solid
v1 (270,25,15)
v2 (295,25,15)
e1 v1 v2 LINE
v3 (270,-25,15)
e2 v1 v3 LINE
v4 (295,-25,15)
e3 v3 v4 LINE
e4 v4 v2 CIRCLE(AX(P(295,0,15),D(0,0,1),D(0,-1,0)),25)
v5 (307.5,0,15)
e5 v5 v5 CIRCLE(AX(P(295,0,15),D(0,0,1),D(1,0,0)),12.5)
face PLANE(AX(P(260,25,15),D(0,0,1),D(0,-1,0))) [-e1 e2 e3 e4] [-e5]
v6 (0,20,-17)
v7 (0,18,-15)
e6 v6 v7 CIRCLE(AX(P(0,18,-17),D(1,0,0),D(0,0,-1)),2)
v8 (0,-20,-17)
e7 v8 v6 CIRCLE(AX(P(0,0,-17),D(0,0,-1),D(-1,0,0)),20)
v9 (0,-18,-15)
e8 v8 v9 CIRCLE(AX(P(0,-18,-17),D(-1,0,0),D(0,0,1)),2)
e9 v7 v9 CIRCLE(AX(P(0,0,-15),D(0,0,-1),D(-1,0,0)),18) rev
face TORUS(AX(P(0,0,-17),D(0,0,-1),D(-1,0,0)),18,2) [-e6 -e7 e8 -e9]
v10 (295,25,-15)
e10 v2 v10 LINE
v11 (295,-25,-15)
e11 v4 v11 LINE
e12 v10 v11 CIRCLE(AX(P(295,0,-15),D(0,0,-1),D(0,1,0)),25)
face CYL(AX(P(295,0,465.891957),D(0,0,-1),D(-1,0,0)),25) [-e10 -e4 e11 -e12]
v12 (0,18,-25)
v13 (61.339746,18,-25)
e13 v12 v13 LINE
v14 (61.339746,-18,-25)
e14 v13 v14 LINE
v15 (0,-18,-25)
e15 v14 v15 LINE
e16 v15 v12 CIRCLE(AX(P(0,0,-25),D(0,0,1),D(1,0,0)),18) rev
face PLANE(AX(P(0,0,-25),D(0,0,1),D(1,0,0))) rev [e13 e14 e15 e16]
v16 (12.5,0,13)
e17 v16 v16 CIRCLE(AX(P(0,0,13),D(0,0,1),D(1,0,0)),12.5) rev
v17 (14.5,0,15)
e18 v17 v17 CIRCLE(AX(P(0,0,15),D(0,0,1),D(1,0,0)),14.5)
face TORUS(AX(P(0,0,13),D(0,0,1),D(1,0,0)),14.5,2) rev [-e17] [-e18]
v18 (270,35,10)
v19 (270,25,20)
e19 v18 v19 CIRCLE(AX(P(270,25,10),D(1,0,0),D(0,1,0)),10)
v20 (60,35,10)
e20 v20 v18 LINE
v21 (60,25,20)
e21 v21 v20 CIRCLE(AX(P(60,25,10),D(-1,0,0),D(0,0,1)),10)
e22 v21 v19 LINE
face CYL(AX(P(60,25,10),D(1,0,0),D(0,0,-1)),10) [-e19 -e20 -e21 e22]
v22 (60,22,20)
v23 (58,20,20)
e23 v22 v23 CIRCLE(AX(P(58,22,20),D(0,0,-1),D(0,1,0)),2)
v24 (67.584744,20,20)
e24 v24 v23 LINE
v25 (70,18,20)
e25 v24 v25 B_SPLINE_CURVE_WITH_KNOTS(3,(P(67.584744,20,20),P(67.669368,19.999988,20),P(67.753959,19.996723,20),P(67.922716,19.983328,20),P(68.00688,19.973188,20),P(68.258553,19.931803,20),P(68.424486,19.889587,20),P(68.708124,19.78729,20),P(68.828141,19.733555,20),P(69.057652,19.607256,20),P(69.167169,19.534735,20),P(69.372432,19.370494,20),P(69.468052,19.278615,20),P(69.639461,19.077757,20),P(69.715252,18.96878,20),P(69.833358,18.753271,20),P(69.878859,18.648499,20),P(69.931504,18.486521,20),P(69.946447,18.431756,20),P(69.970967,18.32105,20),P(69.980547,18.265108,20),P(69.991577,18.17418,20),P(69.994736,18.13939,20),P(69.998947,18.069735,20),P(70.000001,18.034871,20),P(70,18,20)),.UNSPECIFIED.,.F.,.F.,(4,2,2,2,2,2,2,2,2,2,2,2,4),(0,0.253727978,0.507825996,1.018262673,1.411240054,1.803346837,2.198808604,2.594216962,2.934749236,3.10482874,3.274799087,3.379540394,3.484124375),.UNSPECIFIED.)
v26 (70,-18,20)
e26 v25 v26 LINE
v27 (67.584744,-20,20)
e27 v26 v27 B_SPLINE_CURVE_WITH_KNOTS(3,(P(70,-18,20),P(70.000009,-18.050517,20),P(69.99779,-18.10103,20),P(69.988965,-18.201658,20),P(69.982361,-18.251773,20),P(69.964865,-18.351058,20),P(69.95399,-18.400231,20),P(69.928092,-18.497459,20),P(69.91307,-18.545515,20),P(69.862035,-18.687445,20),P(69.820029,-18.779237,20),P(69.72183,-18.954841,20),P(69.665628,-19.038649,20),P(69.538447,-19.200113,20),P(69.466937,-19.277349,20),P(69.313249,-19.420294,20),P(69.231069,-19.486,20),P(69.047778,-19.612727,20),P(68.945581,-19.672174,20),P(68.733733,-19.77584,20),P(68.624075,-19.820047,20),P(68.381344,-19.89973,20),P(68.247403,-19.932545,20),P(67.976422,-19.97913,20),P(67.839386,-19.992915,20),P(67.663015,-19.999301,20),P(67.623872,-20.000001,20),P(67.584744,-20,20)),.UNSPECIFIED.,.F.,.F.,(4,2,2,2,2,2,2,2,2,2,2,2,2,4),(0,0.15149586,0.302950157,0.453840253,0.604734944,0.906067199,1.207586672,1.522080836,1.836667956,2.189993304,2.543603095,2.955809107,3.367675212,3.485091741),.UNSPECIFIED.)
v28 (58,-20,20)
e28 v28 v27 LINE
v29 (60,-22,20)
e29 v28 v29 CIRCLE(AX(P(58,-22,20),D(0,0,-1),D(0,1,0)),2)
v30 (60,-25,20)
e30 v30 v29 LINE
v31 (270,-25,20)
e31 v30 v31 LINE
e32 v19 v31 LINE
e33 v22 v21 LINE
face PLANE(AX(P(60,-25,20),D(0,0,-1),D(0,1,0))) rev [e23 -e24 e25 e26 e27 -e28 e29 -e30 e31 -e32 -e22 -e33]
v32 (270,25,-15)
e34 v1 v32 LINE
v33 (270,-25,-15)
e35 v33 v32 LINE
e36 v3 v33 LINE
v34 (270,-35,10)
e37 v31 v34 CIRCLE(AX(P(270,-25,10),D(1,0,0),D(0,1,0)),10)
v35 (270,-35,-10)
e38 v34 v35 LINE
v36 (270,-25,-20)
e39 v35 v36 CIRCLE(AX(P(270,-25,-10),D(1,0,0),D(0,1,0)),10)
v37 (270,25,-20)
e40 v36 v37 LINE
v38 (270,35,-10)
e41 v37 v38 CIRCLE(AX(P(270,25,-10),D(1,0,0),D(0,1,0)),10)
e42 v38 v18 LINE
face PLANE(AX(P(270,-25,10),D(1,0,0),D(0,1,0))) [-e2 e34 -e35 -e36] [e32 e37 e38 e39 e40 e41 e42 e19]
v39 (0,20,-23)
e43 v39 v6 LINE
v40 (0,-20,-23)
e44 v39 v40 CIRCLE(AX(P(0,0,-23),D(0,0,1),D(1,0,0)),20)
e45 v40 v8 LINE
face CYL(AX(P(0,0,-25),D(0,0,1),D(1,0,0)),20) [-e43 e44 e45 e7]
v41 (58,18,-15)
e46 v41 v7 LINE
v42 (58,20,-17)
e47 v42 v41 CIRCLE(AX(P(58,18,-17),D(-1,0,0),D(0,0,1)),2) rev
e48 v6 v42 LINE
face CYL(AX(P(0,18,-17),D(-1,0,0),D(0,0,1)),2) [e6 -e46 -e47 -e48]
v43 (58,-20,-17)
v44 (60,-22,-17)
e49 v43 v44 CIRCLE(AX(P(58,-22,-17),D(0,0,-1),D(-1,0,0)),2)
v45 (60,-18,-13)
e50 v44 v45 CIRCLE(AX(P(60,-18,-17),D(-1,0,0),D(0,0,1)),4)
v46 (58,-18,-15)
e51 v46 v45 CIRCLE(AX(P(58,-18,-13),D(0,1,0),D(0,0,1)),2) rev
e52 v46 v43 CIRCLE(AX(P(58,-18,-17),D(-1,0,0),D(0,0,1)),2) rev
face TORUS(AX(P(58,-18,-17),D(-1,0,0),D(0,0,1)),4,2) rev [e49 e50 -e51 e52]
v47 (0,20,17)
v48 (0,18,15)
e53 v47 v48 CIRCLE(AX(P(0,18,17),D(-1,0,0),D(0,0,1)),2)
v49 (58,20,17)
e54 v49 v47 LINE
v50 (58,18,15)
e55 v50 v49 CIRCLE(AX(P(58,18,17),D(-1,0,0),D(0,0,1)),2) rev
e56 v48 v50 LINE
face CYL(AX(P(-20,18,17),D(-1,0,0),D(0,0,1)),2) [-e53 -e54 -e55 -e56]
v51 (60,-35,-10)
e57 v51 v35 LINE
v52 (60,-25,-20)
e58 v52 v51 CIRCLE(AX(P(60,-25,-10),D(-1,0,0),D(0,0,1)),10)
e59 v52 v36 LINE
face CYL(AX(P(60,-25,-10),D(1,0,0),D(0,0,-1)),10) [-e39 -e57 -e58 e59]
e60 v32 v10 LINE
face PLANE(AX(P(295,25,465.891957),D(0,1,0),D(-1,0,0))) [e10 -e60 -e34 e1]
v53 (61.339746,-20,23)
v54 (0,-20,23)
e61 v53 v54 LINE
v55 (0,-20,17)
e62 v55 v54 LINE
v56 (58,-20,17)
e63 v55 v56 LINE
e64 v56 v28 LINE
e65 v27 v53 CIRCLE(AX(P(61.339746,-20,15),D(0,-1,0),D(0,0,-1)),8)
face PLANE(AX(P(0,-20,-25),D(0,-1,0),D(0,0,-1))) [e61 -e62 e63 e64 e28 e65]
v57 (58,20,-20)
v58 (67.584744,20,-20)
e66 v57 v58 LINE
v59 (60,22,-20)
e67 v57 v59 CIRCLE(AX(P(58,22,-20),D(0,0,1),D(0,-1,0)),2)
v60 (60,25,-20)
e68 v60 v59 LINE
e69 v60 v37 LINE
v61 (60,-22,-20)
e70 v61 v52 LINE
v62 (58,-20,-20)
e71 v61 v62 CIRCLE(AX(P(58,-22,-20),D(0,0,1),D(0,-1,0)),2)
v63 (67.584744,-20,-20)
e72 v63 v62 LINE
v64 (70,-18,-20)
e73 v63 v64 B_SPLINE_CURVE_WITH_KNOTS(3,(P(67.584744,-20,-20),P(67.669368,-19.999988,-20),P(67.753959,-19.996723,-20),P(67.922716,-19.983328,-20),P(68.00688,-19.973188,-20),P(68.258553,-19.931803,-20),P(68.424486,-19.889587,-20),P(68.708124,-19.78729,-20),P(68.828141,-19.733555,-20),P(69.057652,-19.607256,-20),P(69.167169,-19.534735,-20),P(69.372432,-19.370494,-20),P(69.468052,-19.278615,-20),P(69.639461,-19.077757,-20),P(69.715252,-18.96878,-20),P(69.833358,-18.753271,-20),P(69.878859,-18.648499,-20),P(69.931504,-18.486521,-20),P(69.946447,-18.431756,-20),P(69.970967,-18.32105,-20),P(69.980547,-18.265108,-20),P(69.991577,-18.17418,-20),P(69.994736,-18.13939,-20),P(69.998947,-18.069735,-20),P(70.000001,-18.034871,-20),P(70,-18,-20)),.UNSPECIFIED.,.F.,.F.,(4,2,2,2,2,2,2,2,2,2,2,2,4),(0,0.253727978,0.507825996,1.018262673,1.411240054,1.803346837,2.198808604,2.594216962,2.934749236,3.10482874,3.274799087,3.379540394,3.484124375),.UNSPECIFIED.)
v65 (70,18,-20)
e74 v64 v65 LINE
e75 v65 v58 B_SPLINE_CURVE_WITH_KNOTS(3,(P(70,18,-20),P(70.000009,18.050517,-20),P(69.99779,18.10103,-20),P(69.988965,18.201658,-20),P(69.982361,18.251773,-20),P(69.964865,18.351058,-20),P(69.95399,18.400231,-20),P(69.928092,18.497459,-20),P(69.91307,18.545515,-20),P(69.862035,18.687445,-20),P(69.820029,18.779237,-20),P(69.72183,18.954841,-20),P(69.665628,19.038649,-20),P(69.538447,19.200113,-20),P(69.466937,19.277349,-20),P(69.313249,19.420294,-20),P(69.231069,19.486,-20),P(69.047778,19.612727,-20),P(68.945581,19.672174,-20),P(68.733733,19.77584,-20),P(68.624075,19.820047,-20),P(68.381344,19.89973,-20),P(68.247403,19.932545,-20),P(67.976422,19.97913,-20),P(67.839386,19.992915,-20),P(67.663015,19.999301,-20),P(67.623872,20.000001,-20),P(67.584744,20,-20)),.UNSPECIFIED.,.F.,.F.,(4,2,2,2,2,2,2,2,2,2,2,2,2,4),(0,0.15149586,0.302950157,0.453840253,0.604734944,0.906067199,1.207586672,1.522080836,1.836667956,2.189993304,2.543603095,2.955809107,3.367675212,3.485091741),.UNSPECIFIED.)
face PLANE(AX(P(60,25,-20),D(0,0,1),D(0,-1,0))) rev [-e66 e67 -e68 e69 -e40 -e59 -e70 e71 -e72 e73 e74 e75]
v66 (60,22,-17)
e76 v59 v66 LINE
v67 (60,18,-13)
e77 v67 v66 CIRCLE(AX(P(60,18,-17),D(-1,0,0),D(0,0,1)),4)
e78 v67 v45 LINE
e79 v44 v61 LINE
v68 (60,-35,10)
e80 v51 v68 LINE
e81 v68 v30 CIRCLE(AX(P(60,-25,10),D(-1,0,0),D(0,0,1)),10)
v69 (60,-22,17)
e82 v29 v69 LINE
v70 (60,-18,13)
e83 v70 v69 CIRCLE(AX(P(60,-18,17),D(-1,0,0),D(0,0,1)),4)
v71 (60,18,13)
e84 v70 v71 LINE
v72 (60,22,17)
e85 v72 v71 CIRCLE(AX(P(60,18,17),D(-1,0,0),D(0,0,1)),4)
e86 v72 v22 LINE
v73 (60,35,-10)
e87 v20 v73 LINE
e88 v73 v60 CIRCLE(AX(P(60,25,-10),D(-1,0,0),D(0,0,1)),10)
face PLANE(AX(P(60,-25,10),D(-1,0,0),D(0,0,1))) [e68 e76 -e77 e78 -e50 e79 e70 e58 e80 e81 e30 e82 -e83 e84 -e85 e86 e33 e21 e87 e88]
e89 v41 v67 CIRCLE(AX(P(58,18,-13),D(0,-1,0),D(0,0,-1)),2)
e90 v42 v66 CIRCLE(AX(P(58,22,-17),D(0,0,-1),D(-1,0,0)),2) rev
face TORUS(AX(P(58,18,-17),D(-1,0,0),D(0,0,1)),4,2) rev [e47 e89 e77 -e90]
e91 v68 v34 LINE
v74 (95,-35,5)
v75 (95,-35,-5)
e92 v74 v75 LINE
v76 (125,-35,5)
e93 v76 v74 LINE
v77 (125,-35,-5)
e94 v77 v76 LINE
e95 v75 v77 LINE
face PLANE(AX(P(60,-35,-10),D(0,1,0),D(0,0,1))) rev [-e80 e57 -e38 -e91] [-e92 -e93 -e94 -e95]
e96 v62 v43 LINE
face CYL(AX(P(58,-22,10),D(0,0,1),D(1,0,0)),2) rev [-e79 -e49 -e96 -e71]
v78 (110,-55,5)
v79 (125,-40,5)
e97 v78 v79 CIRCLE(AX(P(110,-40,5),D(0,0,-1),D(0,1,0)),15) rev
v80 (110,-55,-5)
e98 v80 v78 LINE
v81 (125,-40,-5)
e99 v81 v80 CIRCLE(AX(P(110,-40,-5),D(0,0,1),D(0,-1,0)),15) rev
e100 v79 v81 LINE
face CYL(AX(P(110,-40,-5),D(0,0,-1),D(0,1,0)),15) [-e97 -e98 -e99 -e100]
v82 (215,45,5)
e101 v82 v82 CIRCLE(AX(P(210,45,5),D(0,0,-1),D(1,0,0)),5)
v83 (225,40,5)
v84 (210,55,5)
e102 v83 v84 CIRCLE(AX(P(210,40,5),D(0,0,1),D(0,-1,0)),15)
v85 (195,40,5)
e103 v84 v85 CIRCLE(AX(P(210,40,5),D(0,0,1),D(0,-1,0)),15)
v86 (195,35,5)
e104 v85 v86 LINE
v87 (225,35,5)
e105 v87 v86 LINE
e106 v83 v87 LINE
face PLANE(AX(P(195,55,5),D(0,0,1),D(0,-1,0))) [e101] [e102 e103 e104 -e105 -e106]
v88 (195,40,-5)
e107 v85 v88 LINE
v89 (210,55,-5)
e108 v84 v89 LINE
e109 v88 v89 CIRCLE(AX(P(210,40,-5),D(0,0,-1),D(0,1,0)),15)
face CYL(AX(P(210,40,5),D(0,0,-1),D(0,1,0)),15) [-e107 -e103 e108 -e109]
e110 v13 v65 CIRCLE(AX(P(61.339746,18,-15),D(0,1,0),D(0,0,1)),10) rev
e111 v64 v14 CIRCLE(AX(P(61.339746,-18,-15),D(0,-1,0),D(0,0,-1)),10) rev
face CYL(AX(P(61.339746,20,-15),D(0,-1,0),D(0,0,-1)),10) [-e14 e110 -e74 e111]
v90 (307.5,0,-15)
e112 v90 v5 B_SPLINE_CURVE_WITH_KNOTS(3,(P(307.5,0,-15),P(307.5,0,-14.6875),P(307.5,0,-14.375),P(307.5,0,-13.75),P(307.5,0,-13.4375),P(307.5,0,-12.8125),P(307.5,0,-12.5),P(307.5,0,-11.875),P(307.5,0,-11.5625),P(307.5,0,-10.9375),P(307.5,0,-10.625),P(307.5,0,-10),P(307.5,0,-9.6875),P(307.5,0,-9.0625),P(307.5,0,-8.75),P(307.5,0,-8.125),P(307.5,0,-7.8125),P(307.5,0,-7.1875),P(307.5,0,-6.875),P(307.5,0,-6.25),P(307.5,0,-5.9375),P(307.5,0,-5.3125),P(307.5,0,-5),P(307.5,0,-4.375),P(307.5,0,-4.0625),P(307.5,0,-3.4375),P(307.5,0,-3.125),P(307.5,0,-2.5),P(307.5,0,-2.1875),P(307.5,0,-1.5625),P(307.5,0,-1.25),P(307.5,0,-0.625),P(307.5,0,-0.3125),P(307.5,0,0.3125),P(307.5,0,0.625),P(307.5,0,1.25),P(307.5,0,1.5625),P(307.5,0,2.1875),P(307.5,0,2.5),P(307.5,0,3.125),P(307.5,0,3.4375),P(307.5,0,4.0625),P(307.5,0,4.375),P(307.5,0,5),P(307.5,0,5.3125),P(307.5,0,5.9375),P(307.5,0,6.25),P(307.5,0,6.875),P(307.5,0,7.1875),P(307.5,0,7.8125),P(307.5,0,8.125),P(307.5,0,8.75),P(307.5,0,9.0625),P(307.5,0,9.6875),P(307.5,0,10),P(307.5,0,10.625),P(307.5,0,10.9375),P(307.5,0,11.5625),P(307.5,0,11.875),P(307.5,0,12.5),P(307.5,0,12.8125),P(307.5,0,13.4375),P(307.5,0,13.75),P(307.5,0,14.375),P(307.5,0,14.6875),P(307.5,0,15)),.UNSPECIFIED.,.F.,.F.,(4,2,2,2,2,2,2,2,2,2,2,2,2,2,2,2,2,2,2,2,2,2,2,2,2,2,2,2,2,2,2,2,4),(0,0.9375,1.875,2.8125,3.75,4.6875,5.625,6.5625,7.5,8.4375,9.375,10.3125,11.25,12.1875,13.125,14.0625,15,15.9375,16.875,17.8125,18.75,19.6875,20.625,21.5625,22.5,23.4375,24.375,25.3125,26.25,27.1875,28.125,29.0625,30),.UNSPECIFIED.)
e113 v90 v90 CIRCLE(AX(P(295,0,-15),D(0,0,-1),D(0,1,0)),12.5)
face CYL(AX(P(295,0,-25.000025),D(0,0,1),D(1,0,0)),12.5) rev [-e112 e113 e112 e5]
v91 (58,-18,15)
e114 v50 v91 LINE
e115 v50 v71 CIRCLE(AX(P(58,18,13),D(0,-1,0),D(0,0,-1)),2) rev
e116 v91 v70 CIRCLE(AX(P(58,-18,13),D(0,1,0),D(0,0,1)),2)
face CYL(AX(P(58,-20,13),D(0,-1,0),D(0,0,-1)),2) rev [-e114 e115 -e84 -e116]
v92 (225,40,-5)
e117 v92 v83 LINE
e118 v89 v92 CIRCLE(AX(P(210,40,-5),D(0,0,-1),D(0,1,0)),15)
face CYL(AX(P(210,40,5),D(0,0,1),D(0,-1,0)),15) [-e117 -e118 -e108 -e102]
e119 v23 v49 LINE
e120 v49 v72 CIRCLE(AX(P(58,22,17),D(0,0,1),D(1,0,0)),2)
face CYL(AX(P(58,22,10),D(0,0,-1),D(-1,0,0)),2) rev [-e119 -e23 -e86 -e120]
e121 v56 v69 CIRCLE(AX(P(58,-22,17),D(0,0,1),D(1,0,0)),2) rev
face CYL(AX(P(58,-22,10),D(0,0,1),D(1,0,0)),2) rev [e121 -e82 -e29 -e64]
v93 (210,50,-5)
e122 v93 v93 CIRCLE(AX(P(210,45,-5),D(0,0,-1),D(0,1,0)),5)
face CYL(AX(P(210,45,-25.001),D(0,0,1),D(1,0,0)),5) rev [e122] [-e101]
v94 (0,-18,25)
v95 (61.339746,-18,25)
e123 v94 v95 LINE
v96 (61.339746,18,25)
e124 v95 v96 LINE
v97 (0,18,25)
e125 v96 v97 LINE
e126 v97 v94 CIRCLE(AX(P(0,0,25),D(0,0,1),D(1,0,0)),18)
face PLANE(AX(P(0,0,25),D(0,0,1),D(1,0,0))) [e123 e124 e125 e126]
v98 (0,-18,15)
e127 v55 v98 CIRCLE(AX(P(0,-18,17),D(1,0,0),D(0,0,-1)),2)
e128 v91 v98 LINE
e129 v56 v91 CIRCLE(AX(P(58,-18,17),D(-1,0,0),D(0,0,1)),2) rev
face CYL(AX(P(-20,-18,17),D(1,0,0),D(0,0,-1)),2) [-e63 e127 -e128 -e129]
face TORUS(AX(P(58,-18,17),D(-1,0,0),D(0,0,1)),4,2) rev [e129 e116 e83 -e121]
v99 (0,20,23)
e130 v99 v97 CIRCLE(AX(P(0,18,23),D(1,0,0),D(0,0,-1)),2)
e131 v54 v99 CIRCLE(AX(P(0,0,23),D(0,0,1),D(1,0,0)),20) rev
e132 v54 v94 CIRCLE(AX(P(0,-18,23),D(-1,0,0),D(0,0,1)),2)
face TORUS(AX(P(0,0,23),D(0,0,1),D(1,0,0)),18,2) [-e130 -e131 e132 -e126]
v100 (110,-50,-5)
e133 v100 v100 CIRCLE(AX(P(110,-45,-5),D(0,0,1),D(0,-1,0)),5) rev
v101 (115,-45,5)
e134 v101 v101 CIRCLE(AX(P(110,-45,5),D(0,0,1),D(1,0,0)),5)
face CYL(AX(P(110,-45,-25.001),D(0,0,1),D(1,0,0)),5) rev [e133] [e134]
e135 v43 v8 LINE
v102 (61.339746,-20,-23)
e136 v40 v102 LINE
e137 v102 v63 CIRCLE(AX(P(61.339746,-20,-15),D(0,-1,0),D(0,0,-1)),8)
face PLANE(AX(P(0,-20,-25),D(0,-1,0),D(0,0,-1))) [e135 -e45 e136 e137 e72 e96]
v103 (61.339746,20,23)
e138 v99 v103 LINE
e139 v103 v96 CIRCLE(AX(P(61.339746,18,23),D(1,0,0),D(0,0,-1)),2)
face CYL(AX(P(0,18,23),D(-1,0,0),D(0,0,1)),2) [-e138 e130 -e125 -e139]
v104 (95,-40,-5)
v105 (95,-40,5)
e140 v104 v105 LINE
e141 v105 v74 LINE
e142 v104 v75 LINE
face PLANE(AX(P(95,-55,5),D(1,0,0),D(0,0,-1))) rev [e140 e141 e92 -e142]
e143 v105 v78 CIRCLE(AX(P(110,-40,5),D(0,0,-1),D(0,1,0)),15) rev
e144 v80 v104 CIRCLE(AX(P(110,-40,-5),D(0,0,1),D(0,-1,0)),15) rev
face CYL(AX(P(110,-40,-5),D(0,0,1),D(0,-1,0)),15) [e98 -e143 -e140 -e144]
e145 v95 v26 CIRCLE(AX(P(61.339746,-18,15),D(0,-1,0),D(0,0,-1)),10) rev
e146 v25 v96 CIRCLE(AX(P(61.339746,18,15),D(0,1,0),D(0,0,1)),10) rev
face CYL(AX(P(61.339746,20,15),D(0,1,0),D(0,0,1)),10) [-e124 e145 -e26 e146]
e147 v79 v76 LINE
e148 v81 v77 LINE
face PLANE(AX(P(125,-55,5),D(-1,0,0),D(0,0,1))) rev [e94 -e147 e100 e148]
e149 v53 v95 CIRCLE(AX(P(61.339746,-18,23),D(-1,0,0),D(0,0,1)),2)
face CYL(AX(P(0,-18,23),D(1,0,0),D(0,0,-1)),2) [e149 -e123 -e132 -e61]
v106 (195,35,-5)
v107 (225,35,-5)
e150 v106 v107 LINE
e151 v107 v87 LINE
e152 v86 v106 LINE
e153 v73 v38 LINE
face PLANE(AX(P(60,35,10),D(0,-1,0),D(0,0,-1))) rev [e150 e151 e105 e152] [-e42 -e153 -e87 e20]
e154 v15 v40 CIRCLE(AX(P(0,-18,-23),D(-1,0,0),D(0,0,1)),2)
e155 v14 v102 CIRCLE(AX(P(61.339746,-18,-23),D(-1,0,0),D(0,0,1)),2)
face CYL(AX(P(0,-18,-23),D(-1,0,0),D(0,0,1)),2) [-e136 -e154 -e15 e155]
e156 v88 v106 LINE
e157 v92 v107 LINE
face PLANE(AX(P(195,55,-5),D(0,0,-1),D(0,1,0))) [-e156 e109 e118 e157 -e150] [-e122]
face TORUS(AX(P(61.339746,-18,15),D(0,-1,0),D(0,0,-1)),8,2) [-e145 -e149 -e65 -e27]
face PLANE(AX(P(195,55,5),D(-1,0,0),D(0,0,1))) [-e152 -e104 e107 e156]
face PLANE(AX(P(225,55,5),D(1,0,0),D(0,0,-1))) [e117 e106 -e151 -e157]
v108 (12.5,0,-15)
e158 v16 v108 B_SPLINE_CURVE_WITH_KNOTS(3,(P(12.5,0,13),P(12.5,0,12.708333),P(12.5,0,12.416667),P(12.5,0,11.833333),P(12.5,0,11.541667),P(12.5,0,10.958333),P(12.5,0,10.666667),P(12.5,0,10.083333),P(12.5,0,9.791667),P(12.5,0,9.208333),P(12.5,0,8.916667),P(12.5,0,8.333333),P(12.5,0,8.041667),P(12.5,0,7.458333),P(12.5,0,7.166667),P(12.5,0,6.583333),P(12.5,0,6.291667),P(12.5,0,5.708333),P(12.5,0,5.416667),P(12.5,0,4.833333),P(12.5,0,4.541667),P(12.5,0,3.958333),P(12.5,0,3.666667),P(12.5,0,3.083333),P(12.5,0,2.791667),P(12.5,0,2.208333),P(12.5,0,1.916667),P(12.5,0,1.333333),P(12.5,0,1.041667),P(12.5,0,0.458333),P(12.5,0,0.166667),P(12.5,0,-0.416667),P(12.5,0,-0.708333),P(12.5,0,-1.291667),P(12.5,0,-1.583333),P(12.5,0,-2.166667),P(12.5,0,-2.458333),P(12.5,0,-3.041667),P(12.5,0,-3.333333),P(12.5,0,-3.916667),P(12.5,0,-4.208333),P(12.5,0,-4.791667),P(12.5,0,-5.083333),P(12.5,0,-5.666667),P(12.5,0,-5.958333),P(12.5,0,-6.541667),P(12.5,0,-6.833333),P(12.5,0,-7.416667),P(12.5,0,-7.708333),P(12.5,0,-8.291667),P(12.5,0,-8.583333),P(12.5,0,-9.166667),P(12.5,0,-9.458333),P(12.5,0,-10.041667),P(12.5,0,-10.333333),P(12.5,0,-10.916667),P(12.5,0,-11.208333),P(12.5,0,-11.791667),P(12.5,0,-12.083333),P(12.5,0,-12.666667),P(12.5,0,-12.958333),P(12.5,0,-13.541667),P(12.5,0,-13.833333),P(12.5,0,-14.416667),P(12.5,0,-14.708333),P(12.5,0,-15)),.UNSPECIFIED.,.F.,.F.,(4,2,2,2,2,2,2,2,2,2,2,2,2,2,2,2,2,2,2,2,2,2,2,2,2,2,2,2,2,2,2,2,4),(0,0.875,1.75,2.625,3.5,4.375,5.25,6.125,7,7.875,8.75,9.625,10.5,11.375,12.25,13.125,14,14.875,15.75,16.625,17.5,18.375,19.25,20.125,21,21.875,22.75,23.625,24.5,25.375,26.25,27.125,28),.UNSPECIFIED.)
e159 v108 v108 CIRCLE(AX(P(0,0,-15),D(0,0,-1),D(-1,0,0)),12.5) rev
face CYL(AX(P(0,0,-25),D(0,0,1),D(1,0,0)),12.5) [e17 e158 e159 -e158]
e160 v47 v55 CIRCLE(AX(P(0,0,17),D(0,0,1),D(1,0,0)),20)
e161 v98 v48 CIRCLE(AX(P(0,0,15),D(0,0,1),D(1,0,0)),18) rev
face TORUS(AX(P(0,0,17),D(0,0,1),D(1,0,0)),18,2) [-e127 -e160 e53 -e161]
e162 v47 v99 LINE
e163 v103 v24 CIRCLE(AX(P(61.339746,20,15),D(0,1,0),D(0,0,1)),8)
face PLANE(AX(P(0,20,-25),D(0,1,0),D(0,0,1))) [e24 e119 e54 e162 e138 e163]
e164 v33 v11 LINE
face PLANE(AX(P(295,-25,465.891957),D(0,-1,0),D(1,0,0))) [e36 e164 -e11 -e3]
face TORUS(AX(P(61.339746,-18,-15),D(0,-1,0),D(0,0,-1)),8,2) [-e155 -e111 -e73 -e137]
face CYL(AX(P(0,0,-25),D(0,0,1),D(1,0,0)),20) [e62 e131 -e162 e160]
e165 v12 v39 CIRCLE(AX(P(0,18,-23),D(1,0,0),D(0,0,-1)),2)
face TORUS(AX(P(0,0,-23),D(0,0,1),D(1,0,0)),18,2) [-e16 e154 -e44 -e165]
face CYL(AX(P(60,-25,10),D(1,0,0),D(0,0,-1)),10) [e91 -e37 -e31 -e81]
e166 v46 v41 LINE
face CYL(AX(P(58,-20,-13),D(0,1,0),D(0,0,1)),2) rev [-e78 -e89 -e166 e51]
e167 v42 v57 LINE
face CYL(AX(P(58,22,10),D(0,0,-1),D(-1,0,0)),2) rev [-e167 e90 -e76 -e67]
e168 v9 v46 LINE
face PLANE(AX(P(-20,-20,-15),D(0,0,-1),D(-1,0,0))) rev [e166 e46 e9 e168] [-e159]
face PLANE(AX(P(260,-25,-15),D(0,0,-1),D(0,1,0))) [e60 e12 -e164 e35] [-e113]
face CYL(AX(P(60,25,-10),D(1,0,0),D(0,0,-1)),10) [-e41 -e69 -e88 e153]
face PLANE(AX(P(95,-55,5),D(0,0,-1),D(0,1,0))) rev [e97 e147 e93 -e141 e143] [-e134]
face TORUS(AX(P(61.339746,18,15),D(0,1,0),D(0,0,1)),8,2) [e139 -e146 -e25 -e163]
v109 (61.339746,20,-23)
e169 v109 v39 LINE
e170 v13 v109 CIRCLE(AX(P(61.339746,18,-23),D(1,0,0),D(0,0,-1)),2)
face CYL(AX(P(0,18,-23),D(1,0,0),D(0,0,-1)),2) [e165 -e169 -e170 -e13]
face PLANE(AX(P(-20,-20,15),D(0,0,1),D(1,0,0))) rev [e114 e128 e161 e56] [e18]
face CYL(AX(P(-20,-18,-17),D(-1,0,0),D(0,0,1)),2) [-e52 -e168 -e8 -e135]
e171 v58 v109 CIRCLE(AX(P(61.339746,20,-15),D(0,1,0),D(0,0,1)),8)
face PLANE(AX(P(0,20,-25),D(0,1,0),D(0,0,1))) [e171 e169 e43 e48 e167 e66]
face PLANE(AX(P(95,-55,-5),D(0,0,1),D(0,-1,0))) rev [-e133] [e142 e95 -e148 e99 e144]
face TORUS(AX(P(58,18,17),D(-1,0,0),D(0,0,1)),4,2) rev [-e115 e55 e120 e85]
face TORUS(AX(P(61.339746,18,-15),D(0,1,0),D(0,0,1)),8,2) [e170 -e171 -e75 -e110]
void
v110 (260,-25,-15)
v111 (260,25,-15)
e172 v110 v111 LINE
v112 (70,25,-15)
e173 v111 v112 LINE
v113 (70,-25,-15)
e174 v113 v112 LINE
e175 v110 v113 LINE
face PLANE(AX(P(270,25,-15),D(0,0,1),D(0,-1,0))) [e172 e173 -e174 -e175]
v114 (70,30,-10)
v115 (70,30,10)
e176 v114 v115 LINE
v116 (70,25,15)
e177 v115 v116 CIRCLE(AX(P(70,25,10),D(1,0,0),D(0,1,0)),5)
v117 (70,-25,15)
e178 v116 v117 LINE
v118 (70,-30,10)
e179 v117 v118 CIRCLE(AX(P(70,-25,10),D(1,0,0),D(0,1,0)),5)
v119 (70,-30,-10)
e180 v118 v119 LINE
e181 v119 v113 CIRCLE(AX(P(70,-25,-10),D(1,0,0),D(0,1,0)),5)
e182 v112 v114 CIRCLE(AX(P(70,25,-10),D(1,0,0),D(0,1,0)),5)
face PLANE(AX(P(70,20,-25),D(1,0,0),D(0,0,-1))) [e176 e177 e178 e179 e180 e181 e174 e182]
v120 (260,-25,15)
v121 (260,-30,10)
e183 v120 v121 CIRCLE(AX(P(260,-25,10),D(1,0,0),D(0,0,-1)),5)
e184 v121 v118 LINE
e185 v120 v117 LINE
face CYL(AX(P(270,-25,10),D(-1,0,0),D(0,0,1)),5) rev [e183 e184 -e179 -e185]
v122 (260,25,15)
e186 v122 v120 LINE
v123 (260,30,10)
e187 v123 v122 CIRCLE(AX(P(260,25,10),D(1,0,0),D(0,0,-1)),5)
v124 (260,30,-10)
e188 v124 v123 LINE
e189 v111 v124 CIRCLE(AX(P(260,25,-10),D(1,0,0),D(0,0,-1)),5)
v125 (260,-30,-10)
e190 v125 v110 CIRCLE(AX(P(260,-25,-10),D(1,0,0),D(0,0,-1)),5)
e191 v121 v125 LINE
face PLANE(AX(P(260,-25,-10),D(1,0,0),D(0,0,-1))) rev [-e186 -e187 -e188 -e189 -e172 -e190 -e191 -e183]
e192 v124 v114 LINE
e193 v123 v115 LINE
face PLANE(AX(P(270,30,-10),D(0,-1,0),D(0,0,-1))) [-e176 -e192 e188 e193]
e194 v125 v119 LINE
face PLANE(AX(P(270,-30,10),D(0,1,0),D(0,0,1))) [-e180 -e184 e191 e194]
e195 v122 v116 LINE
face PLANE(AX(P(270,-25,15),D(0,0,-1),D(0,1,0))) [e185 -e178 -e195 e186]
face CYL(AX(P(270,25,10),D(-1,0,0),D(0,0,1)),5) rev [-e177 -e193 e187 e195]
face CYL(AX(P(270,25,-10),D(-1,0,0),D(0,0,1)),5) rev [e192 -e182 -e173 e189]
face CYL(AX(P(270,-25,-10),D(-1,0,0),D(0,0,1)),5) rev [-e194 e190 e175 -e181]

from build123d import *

# Parameters (mm, degrees)
BOSS_EXTRUDE1_DEPTH      = 25
BOSS_EXTRUDE1_DEPTH_BACK = 25
SKETCH2_W                = 30
SKETCH2_H                = 40
CUT_EXTRUDE1_DEPTH       = 96.524865873
BOSS_EXTRUDE2_REACH      = 90.318
SKETCH3_R                = 12.5
STRUCTURAL_MEMBER1_DEPTH = 200
BOSS_EXTRUDE3_DEPTH      = 10
BOSS_EXTRUDE4_DEPTH      = 50
BOSS_EXTRUDE4_DEPTH_BACK = 10
CUT_EXTRUDE6_START       = -30
CUT_EXTRUDE6_DEPTH       = 30
SKETCH16_R               = 12.5
CUT_EXTRUDE7_DEPTH       = 325.384031666
FILLET1_R                = 10
FILLET2_R                = 2
FILLET3_R                = 2
SKETCH19_W               = 30
SKETCH19_H               = 10
BOSS_EXTRUDE6_DEPTH      = 20
FILLET5_R                = 15
CUT_EXTRUDE8_REACH       = 328.075
SKETCH20_R               = 5
FILLET5_OF_MIRROR9_R     = 15
LPATTERN1_START          = -5
LPATTERN1_OUTLINE_R      = 5
LPATTERN1_DEPTH          = 10
CUT_EXTRUDE9_START       = 35
CUT_EXTRUDE9_OUTLINE_W   = 30
CUT_EXTRUDE9_OUTLINE_H   = 10
CUT_EXTRUDE9_DEPTH       = 20
CUT_EXTRUDE10_START      = -25
CUT_EXTRUDE10_OUTLINE_R  = 5
CUT_EXTRUDE10_DEPTH      = 10


# Read off the part's stored shape, not the designer's step: Cut-Extrude6, LPattern1, Cut-Extrude9, Cut-Extrude10
# Some blends are built 0.0001 mm under size
with BuildPart() as part:
    # Sketch1 → Boss-Extrude1 (new, two sides: drawn at the far end of the back side and taken through both)
    with BuildSketch(Plane.XY.offset(-BOSS_EXTRUDE1_DEPTH_BACK)):
        with BuildLine():
            Line((0, 20), (70, 20))
            Line((70, 20), (70, -20))
            Line((70, -20), (0, -20))
            ThreePointArc((0, -20), (-20, 0), (0, 20))
        make_face()
    extrude(amount=BOSS_EXTRUDE1_DEPTH + BOSS_EXTRUDE1_DEPTH_BACK)

    # Sketch2 → Cut-Extrude1 (cut, through all)
    with BuildSketch(Plane(origin=(70, 0, 0), x_dir=(0, 0, -1), z_dir=(1, 0, 0))):
        Rectangle(SKETCH2_W, SKETCH2_H)
    extrude(amount=-CUT_EXTRUDE1_DEPTH, mode=Mode.SUBTRACT)


with BuildPart() as cut_extrude1_piece_1:
    # of the separate pieces the step leaves, piece 1, a body of its own (cut_extrude1_pieces)
    add(part.part.solids().sort_by_distance((0, 20, -25))[0])

    # Sketch3 → Boss-Extrude2 (add, up to next)
    with BuildSketch(Plane.XY.offset(25), mode=Mode.PRIVATE) as boss_extrude2_sk1:
        Circle(SKETCH3_R)
    boss_extrude2_tool1 = extrude(boss_extrude2_sk1.sketch, amount=-BOSS_EXTRUDE2_REACH, mode=Mode.PRIVATE) - cut_extrude1_piece_1.part


with BuildPart() as cut_extrude1_piece_2:
    # of the separate pieces the step leaves, piece 2, a body of its own (cut_extrude1_pieces)
    add(part.part.solids().sort_by_distance((0, 20, 15))[0])


with BuildPart() as cut_extrude1_piece_1_1:
    add(cut_extrude1_piece_1.part)

    add(cut_extrude1_piece_2.part)  # Boss-Extrude2 merges Cut-Extrude1 piece 2
    add(boss_extrude2_tool1.solids().sort_by_distance((0, 0, 25))[0])



with BuildPart() as body_2:
    # Sketch11 → Structural Member1 (new body)
    with BuildSketch(Plane(origin=(70, 0, 0), x_dir=(0, 0, 1), z_dir=(1, 0, 0))):
        with BuildLine():
            Line((-10, -35), (10, -35))
            ThreePointArc((10, -35), (17.071067812, -32.071067812), (20, -25))
            Line((20, -25), (20, 25))
            ThreePointArc((20, 25), (17.071067812, 32.071067812), (10, 35))
            Line((10, 35), (-10, 35))
            ThreePointArc((-10, 35), (-17.071067812, 32.071067812), (-20, 25))
            Line((-20, 25), (-20, -25))
            ThreePointArc((-20, -25), (-17.071067812, -32.071067812), (-10, -35))
        make_face()
        with BuildLine():
            Line((-10, -30), (10, -30))
            ThreePointArc((10, -30), (13.535533906, -28.535533906), (15, -25))
            Line((15, -25), (15, 25))
            ThreePointArc((15, 25), (13.535533906, 28.535533906), (10, 30))
            Line((10, 30), (-10, 30))
            ThreePointArc((-10, 30), (-13.535533906, 28.535533906), (-15, 25))
            Line((-15, 25), (-15, -25))
            ThreePointArc((-15, -25), (-13.535533906, -28.535533906), (-10, -30))
        make_face(mode=Mode.SUBTRACT)
    extrude(amount=STRUCTURAL_MEMBER1_DEPTH)


with BuildPart() as cut_extrude1_piece_1_2:
    add(cut_extrude1_piece_1_1.part)

    add(body_2.part)  # Boss-Extrude3 merges body 2
    # Sketch12 → Boss-Extrude3 (add)
    with BuildSketch(Plane.ZY.offset(-70)):
        with BuildLine():
            Line((20, -25), (20, 25))
            ThreePointArc((20, 25), (17.071067812, 32.071067812), (10, 35))
            Line((10, 35), (-10, 35))
            ThreePointArc((-10, 35), (-17.071067812, 32.071067812), (-20, 25))
            Line((-20, 25), (-20, -25))
            ThreePointArc((-20, -25), (-17.071067812, -32.071067812), (-10, -35))
            Line((-10, -35), (10, -35))
            ThreePointArc((10, -35), (17.071067812, -32.071067812), (20, -25))
        make_face()
    extrude(amount=BOSS_EXTRUDE3_DEPTH)

    # Sketch14 → Boss-Extrude4 (add, two sides: drawn at the far end of the back side and taken through both)
    with BuildSketch(Plane(origin=(270, 0, 0), x_dir=(0, 0, -1), z_dir=(1, 0, 0)).offset(-BOSS_EXTRUDE4_DEPTH_BACK)):
        with BuildLine():
            Line((15, -25), (15, 25))
            ThreePointArc((15, 25), (13.535533906, 28.535533906), (10, 30))
            Line((10, 30), (-10, 30))
            ThreePointArc((-10, 30), (-13.535533906, 28.535533906), (-15, 25))
            Line((-15, 25), (-15, -25))
            ThreePointArc((-15, -25), (-13.535533906, -28.535533906), (-10, -30))
            Line((-10, -30), (10, -30))
            ThreePointArc((10, -30), (13.535533906, -28.535533906), (15, -25))
        make_face()
    extrude(amount=BOSS_EXTRUDE4_DEPTH + BOSS_EXTRUDE4_DEPTH_BACK)

    # Cut-Extrude6 outline → Cut-Extrude6 (cut)
    with BuildSketch(Plane.XY.offset(15).offset(CUT_EXTRUDE6_START)):
        with BuildLine():
            Line((270, -25), (270, -30))
            Line((270, -30), (320, -30))
            Line((320, -30), (320, -2.73e-07))
            ThreePointArc((320, -2.73e-07), (312.677669433, -17.677669626), (295, -25))
            Line((295, -25), (270, -25))
        make_face()
        with BuildLine():
            Line((270, 30), (270, 25))
            Line((270, 25), (295, 25))
            ThreePointArc((295, 25), (312.677669626, 17.677669433), (320, -2.73e-07))
            Line((320, -2.73e-07), (320, 30))
            Line((320, 30), (270, 30))
        make_face()
    extrude(amount=CUT_EXTRUDE6_DEPTH, mode=Mode.SUBTRACT)

    # Sketch16 → Cut-Extrude7 (cut, through all)
    with BuildSketch(Plane.XY.offset(15)):
        with Locations((295, 0)):
            Circle(SKETCH16_R)
    extrude(amount=-CUT_EXTRUDE7_DEPTH, mode=Mode.SUBTRACT)

    # Fillet1
    # the kernel refuses this fillet: 10 mm, written as the material it takes off along each edge
    with BuildSketch(Plane(origin=(70, 41.650635095, -25), x_dir=(0, 0, 1), z_dir=(0, -1, 0))) as fillet1_piece_1:
        with BuildLine():
            CenterArc((10, 8.660254038), FILLET1_R, 180, 60)
            Line((0, 8.660254038), (-0.2, 8.660254038))
            Line((-0.2, 8.660254038), (-0.2, 0))
            Line((-0.2, 0), (0, -0.2))
            ThreePointArc((0, -0.2), (2.5, -0.2), (4.9, -0.173205081))
            Line((4.9, -0.173205081), (5, 0))
        make_face()
    extrude(amount=83.301270189, mode=Mode.SUBTRACT)
    with BuildSketch(Plane(origin=(70, 41.650635095, 25), x_dir=(0, 0, -1), z_dir=(0, -1, 0))) as fillet1_piece_2:
        with BuildLine():
            CenterArc((10, -8.660254038), FILLET1_R, 120, 60)
            Line((0, -8.660254038), (-0.2, -8.660254038))
            Line((-0.2, -8.660254038), (-0.2, 0))
            Line((-0.2, 0), (0, 0.2))
            ThreePointArc((0, 0.2), (2.5, 0.2), (4.9, 0.173205081))
            Line((4.9, 0.173205081), (5, 0))
        make_face()
    extrude(amount=83.301270189, mode=Mode.SUBTRACT)

    # Fillet2
    fillet2_edges = [cut_extrude1_piece_1_2.edges().sort_by_distance(p)[0] for p in [
        (-12.5, 0, 15),
        (30, 20, -15),
        (-20, 0, -15),
        (30, -20, -15),
        (-20, 0, 15),
        (30, 20, 15),
        (60, 0, -15),
        (30, -20, 15),
        (60, 0, 15),
        (60, 20, 17.5),
        (60, 20, -17.5),
        (60, -20, -17.5),
        (60, -20, 17.5),
    ]]
    fillet(fillet2_edges, radius=FILLET2_R)

    # Fillet3
    fillet3_edges = [cut_extrude1_piece_1_2.edges().sort_by_distance(p)[0] for p in [
        (66.339745962, 20, 23.660254038),
        (30.669872981, 20, 25),
        (-20, 0, 25),
        (66.339745962, -20, 23.660254038),
        (66.339745962, 20, -23.660254038),
        (30.669872981, 20, -25),
        (-20, 0, -25),
        (66.339745962, -20, -23.660254038),
        (30.669872981, -20, 25),
        (30.669872981, -20, -25),
    ]]
    fillet(fillet3_edges, radius=FILLET3_R)

    # Sketch19 → Boss-Extrude6 (add)
    with BuildSketch(Plane.XZ.offset(35)):
        with Locations((110, 0)):
            Rectangle(SKETCH19_W, SKETCH19_H)
    boss_extrude6 = extrude(amount=BOSS_EXTRUDE6_DEPTH)

    # Fillet5
    fillet5_edges = [cut_extrude1_piece_1_2.edges().sort_by_distance(p)[0] for p in [
        (95, -55, 0),
        (125, -55, 0),
    ]]
    fillet(fillet5_edges, radius=FILLET5_R - 0.0001)  # a hair under: the kernel refuses the full size

    # Sketch20 → Cut-Extrude8 (cut, up to next)
    with BuildSketch(Plane.XY.offset(5), mode=Mode.PRIVATE) as cut_extrude8_sk1:
        with Locations((110, -45)):
            Circle(SKETCH20_R)
    cut_extrude8_tool1 = extrude(cut_extrude8_sk1.sketch, amount=-CUT_EXTRUDE8_REACH, mode=Mode.PRIVATE) & cut_extrude1_piece_1_2.part
    cut_extrude8 = cut_extrude8_tool1.solids().sort_by_distance((110, -45, 5))[0]
    add(cut_extrude8, mode=Mode.SUBTRACT)

    # Mirror9: Boss-Extrude6, Cut-Extrude8 across plane
    add(boss_extrude6.mirror(Plane.ZX))
    add(cut_extrude8.mirror(Plane.ZX), mode=Mode.SUBTRACT)

    # Fillet5 of Mirror9
    fillet5_of_mirror9_edges = [cut_extrude1_piece_1_2.edges().sort_by_distance(p)[0] for p in [
        (95, 55, 0),
        (125, 55, 0),
    ]]
    fillet(fillet5_of_mirror9_edges, radius=FILLET5_OF_MIRROR9_R - 0.0001)  # a hair under: the kernel refuses the full size

    # LPattern1 outline → LPattern1 (add)
    # profile 1 of 2: a face of its own
    with BuildSketch(Plane.XY.offset(LPATTERN1_START)):
        with BuildLine():
            Line((195, 35), (225, 35))
            Line((225, 35), (225, 40))
            ThreePointArc((225, 40), (220.606601718, 50.606601718), (210, 55))
            ThreePointArc((210, 55), (199.393398282, 50.606601718), (195, 40))
            Line((195, 40), (195, 35))
        make_face()
        with Locations((210, 45)):
            Circle(LPATTERN1_OUTLINE_R, mode=Mode.SUBTRACT)
    # profile 2 of 2: a face of its own
    with BuildSketch(Plane.XY.offset(LPATTERN1_START)):
        with BuildLine():
            Line((225, -40), (225, -35))
            Line((225, -35), (195, -35))
            Line((195, -35), (195, -40))
            ThreePointArc((195, -40), (199.393398282, -50.606601718), (210, -55))
            ThreePointArc((210, -55), (220.606601718, -50.606601718), (225, -40))
        make_face()
        with Locations((210, -45)):
            Circle(LPATTERN1_OUTLINE_R, mode=Mode.SUBTRACT)
    extrude(amount=LPATTERN1_DEPTH)

    # Cut-Extrude9 outline → Cut-Extrude9 (cut)
    with BuildSketch(Plane(origin=(0, 0, 0), x_dir=(1, 0, 0), z_dir=(0, 1, 0)).offset(CUT_EXTRUDE9_START)):
        with Locations((110, 0)):
            Rectangle(CUT_EXTRUDE9_OUTLINE_W, CUT_EXTRUDE9_OUTLINE_H)
    extrude(amount=CUT_EXTRUDE9_DEPTH, mode=Mode.SUBTRACT)

    # Cut-Extrude10 outline → Cut-Extrude10 (cut)
    with BuildSketch(Plane.XY.offset(20).offset(CUT_EXTRUDE10_START)):
        with BuildLine():
            Line((225, -40), (225, -35))
            Line((225, -35), (195, -35))
            Line((195, -35), (195, -40))
            ThreePointArc((195, -40), (199.393398282, -50.606601718), (210, -55))
            ThreePointArc((210, -55), (220.606601718, -50.606601718), (225, -40))
        make_face()
        with Locations((210, -45)):
            Circle(CUT_EXTRUDE10_OUTLINE_R, mode=Mode.SUBTRACT)
    extrude(amount=CUT_EXTRUDE10_DEPTH, mode=Mode.SUBTRACT)


solid = cut_extrude1_piece_1_2.part
